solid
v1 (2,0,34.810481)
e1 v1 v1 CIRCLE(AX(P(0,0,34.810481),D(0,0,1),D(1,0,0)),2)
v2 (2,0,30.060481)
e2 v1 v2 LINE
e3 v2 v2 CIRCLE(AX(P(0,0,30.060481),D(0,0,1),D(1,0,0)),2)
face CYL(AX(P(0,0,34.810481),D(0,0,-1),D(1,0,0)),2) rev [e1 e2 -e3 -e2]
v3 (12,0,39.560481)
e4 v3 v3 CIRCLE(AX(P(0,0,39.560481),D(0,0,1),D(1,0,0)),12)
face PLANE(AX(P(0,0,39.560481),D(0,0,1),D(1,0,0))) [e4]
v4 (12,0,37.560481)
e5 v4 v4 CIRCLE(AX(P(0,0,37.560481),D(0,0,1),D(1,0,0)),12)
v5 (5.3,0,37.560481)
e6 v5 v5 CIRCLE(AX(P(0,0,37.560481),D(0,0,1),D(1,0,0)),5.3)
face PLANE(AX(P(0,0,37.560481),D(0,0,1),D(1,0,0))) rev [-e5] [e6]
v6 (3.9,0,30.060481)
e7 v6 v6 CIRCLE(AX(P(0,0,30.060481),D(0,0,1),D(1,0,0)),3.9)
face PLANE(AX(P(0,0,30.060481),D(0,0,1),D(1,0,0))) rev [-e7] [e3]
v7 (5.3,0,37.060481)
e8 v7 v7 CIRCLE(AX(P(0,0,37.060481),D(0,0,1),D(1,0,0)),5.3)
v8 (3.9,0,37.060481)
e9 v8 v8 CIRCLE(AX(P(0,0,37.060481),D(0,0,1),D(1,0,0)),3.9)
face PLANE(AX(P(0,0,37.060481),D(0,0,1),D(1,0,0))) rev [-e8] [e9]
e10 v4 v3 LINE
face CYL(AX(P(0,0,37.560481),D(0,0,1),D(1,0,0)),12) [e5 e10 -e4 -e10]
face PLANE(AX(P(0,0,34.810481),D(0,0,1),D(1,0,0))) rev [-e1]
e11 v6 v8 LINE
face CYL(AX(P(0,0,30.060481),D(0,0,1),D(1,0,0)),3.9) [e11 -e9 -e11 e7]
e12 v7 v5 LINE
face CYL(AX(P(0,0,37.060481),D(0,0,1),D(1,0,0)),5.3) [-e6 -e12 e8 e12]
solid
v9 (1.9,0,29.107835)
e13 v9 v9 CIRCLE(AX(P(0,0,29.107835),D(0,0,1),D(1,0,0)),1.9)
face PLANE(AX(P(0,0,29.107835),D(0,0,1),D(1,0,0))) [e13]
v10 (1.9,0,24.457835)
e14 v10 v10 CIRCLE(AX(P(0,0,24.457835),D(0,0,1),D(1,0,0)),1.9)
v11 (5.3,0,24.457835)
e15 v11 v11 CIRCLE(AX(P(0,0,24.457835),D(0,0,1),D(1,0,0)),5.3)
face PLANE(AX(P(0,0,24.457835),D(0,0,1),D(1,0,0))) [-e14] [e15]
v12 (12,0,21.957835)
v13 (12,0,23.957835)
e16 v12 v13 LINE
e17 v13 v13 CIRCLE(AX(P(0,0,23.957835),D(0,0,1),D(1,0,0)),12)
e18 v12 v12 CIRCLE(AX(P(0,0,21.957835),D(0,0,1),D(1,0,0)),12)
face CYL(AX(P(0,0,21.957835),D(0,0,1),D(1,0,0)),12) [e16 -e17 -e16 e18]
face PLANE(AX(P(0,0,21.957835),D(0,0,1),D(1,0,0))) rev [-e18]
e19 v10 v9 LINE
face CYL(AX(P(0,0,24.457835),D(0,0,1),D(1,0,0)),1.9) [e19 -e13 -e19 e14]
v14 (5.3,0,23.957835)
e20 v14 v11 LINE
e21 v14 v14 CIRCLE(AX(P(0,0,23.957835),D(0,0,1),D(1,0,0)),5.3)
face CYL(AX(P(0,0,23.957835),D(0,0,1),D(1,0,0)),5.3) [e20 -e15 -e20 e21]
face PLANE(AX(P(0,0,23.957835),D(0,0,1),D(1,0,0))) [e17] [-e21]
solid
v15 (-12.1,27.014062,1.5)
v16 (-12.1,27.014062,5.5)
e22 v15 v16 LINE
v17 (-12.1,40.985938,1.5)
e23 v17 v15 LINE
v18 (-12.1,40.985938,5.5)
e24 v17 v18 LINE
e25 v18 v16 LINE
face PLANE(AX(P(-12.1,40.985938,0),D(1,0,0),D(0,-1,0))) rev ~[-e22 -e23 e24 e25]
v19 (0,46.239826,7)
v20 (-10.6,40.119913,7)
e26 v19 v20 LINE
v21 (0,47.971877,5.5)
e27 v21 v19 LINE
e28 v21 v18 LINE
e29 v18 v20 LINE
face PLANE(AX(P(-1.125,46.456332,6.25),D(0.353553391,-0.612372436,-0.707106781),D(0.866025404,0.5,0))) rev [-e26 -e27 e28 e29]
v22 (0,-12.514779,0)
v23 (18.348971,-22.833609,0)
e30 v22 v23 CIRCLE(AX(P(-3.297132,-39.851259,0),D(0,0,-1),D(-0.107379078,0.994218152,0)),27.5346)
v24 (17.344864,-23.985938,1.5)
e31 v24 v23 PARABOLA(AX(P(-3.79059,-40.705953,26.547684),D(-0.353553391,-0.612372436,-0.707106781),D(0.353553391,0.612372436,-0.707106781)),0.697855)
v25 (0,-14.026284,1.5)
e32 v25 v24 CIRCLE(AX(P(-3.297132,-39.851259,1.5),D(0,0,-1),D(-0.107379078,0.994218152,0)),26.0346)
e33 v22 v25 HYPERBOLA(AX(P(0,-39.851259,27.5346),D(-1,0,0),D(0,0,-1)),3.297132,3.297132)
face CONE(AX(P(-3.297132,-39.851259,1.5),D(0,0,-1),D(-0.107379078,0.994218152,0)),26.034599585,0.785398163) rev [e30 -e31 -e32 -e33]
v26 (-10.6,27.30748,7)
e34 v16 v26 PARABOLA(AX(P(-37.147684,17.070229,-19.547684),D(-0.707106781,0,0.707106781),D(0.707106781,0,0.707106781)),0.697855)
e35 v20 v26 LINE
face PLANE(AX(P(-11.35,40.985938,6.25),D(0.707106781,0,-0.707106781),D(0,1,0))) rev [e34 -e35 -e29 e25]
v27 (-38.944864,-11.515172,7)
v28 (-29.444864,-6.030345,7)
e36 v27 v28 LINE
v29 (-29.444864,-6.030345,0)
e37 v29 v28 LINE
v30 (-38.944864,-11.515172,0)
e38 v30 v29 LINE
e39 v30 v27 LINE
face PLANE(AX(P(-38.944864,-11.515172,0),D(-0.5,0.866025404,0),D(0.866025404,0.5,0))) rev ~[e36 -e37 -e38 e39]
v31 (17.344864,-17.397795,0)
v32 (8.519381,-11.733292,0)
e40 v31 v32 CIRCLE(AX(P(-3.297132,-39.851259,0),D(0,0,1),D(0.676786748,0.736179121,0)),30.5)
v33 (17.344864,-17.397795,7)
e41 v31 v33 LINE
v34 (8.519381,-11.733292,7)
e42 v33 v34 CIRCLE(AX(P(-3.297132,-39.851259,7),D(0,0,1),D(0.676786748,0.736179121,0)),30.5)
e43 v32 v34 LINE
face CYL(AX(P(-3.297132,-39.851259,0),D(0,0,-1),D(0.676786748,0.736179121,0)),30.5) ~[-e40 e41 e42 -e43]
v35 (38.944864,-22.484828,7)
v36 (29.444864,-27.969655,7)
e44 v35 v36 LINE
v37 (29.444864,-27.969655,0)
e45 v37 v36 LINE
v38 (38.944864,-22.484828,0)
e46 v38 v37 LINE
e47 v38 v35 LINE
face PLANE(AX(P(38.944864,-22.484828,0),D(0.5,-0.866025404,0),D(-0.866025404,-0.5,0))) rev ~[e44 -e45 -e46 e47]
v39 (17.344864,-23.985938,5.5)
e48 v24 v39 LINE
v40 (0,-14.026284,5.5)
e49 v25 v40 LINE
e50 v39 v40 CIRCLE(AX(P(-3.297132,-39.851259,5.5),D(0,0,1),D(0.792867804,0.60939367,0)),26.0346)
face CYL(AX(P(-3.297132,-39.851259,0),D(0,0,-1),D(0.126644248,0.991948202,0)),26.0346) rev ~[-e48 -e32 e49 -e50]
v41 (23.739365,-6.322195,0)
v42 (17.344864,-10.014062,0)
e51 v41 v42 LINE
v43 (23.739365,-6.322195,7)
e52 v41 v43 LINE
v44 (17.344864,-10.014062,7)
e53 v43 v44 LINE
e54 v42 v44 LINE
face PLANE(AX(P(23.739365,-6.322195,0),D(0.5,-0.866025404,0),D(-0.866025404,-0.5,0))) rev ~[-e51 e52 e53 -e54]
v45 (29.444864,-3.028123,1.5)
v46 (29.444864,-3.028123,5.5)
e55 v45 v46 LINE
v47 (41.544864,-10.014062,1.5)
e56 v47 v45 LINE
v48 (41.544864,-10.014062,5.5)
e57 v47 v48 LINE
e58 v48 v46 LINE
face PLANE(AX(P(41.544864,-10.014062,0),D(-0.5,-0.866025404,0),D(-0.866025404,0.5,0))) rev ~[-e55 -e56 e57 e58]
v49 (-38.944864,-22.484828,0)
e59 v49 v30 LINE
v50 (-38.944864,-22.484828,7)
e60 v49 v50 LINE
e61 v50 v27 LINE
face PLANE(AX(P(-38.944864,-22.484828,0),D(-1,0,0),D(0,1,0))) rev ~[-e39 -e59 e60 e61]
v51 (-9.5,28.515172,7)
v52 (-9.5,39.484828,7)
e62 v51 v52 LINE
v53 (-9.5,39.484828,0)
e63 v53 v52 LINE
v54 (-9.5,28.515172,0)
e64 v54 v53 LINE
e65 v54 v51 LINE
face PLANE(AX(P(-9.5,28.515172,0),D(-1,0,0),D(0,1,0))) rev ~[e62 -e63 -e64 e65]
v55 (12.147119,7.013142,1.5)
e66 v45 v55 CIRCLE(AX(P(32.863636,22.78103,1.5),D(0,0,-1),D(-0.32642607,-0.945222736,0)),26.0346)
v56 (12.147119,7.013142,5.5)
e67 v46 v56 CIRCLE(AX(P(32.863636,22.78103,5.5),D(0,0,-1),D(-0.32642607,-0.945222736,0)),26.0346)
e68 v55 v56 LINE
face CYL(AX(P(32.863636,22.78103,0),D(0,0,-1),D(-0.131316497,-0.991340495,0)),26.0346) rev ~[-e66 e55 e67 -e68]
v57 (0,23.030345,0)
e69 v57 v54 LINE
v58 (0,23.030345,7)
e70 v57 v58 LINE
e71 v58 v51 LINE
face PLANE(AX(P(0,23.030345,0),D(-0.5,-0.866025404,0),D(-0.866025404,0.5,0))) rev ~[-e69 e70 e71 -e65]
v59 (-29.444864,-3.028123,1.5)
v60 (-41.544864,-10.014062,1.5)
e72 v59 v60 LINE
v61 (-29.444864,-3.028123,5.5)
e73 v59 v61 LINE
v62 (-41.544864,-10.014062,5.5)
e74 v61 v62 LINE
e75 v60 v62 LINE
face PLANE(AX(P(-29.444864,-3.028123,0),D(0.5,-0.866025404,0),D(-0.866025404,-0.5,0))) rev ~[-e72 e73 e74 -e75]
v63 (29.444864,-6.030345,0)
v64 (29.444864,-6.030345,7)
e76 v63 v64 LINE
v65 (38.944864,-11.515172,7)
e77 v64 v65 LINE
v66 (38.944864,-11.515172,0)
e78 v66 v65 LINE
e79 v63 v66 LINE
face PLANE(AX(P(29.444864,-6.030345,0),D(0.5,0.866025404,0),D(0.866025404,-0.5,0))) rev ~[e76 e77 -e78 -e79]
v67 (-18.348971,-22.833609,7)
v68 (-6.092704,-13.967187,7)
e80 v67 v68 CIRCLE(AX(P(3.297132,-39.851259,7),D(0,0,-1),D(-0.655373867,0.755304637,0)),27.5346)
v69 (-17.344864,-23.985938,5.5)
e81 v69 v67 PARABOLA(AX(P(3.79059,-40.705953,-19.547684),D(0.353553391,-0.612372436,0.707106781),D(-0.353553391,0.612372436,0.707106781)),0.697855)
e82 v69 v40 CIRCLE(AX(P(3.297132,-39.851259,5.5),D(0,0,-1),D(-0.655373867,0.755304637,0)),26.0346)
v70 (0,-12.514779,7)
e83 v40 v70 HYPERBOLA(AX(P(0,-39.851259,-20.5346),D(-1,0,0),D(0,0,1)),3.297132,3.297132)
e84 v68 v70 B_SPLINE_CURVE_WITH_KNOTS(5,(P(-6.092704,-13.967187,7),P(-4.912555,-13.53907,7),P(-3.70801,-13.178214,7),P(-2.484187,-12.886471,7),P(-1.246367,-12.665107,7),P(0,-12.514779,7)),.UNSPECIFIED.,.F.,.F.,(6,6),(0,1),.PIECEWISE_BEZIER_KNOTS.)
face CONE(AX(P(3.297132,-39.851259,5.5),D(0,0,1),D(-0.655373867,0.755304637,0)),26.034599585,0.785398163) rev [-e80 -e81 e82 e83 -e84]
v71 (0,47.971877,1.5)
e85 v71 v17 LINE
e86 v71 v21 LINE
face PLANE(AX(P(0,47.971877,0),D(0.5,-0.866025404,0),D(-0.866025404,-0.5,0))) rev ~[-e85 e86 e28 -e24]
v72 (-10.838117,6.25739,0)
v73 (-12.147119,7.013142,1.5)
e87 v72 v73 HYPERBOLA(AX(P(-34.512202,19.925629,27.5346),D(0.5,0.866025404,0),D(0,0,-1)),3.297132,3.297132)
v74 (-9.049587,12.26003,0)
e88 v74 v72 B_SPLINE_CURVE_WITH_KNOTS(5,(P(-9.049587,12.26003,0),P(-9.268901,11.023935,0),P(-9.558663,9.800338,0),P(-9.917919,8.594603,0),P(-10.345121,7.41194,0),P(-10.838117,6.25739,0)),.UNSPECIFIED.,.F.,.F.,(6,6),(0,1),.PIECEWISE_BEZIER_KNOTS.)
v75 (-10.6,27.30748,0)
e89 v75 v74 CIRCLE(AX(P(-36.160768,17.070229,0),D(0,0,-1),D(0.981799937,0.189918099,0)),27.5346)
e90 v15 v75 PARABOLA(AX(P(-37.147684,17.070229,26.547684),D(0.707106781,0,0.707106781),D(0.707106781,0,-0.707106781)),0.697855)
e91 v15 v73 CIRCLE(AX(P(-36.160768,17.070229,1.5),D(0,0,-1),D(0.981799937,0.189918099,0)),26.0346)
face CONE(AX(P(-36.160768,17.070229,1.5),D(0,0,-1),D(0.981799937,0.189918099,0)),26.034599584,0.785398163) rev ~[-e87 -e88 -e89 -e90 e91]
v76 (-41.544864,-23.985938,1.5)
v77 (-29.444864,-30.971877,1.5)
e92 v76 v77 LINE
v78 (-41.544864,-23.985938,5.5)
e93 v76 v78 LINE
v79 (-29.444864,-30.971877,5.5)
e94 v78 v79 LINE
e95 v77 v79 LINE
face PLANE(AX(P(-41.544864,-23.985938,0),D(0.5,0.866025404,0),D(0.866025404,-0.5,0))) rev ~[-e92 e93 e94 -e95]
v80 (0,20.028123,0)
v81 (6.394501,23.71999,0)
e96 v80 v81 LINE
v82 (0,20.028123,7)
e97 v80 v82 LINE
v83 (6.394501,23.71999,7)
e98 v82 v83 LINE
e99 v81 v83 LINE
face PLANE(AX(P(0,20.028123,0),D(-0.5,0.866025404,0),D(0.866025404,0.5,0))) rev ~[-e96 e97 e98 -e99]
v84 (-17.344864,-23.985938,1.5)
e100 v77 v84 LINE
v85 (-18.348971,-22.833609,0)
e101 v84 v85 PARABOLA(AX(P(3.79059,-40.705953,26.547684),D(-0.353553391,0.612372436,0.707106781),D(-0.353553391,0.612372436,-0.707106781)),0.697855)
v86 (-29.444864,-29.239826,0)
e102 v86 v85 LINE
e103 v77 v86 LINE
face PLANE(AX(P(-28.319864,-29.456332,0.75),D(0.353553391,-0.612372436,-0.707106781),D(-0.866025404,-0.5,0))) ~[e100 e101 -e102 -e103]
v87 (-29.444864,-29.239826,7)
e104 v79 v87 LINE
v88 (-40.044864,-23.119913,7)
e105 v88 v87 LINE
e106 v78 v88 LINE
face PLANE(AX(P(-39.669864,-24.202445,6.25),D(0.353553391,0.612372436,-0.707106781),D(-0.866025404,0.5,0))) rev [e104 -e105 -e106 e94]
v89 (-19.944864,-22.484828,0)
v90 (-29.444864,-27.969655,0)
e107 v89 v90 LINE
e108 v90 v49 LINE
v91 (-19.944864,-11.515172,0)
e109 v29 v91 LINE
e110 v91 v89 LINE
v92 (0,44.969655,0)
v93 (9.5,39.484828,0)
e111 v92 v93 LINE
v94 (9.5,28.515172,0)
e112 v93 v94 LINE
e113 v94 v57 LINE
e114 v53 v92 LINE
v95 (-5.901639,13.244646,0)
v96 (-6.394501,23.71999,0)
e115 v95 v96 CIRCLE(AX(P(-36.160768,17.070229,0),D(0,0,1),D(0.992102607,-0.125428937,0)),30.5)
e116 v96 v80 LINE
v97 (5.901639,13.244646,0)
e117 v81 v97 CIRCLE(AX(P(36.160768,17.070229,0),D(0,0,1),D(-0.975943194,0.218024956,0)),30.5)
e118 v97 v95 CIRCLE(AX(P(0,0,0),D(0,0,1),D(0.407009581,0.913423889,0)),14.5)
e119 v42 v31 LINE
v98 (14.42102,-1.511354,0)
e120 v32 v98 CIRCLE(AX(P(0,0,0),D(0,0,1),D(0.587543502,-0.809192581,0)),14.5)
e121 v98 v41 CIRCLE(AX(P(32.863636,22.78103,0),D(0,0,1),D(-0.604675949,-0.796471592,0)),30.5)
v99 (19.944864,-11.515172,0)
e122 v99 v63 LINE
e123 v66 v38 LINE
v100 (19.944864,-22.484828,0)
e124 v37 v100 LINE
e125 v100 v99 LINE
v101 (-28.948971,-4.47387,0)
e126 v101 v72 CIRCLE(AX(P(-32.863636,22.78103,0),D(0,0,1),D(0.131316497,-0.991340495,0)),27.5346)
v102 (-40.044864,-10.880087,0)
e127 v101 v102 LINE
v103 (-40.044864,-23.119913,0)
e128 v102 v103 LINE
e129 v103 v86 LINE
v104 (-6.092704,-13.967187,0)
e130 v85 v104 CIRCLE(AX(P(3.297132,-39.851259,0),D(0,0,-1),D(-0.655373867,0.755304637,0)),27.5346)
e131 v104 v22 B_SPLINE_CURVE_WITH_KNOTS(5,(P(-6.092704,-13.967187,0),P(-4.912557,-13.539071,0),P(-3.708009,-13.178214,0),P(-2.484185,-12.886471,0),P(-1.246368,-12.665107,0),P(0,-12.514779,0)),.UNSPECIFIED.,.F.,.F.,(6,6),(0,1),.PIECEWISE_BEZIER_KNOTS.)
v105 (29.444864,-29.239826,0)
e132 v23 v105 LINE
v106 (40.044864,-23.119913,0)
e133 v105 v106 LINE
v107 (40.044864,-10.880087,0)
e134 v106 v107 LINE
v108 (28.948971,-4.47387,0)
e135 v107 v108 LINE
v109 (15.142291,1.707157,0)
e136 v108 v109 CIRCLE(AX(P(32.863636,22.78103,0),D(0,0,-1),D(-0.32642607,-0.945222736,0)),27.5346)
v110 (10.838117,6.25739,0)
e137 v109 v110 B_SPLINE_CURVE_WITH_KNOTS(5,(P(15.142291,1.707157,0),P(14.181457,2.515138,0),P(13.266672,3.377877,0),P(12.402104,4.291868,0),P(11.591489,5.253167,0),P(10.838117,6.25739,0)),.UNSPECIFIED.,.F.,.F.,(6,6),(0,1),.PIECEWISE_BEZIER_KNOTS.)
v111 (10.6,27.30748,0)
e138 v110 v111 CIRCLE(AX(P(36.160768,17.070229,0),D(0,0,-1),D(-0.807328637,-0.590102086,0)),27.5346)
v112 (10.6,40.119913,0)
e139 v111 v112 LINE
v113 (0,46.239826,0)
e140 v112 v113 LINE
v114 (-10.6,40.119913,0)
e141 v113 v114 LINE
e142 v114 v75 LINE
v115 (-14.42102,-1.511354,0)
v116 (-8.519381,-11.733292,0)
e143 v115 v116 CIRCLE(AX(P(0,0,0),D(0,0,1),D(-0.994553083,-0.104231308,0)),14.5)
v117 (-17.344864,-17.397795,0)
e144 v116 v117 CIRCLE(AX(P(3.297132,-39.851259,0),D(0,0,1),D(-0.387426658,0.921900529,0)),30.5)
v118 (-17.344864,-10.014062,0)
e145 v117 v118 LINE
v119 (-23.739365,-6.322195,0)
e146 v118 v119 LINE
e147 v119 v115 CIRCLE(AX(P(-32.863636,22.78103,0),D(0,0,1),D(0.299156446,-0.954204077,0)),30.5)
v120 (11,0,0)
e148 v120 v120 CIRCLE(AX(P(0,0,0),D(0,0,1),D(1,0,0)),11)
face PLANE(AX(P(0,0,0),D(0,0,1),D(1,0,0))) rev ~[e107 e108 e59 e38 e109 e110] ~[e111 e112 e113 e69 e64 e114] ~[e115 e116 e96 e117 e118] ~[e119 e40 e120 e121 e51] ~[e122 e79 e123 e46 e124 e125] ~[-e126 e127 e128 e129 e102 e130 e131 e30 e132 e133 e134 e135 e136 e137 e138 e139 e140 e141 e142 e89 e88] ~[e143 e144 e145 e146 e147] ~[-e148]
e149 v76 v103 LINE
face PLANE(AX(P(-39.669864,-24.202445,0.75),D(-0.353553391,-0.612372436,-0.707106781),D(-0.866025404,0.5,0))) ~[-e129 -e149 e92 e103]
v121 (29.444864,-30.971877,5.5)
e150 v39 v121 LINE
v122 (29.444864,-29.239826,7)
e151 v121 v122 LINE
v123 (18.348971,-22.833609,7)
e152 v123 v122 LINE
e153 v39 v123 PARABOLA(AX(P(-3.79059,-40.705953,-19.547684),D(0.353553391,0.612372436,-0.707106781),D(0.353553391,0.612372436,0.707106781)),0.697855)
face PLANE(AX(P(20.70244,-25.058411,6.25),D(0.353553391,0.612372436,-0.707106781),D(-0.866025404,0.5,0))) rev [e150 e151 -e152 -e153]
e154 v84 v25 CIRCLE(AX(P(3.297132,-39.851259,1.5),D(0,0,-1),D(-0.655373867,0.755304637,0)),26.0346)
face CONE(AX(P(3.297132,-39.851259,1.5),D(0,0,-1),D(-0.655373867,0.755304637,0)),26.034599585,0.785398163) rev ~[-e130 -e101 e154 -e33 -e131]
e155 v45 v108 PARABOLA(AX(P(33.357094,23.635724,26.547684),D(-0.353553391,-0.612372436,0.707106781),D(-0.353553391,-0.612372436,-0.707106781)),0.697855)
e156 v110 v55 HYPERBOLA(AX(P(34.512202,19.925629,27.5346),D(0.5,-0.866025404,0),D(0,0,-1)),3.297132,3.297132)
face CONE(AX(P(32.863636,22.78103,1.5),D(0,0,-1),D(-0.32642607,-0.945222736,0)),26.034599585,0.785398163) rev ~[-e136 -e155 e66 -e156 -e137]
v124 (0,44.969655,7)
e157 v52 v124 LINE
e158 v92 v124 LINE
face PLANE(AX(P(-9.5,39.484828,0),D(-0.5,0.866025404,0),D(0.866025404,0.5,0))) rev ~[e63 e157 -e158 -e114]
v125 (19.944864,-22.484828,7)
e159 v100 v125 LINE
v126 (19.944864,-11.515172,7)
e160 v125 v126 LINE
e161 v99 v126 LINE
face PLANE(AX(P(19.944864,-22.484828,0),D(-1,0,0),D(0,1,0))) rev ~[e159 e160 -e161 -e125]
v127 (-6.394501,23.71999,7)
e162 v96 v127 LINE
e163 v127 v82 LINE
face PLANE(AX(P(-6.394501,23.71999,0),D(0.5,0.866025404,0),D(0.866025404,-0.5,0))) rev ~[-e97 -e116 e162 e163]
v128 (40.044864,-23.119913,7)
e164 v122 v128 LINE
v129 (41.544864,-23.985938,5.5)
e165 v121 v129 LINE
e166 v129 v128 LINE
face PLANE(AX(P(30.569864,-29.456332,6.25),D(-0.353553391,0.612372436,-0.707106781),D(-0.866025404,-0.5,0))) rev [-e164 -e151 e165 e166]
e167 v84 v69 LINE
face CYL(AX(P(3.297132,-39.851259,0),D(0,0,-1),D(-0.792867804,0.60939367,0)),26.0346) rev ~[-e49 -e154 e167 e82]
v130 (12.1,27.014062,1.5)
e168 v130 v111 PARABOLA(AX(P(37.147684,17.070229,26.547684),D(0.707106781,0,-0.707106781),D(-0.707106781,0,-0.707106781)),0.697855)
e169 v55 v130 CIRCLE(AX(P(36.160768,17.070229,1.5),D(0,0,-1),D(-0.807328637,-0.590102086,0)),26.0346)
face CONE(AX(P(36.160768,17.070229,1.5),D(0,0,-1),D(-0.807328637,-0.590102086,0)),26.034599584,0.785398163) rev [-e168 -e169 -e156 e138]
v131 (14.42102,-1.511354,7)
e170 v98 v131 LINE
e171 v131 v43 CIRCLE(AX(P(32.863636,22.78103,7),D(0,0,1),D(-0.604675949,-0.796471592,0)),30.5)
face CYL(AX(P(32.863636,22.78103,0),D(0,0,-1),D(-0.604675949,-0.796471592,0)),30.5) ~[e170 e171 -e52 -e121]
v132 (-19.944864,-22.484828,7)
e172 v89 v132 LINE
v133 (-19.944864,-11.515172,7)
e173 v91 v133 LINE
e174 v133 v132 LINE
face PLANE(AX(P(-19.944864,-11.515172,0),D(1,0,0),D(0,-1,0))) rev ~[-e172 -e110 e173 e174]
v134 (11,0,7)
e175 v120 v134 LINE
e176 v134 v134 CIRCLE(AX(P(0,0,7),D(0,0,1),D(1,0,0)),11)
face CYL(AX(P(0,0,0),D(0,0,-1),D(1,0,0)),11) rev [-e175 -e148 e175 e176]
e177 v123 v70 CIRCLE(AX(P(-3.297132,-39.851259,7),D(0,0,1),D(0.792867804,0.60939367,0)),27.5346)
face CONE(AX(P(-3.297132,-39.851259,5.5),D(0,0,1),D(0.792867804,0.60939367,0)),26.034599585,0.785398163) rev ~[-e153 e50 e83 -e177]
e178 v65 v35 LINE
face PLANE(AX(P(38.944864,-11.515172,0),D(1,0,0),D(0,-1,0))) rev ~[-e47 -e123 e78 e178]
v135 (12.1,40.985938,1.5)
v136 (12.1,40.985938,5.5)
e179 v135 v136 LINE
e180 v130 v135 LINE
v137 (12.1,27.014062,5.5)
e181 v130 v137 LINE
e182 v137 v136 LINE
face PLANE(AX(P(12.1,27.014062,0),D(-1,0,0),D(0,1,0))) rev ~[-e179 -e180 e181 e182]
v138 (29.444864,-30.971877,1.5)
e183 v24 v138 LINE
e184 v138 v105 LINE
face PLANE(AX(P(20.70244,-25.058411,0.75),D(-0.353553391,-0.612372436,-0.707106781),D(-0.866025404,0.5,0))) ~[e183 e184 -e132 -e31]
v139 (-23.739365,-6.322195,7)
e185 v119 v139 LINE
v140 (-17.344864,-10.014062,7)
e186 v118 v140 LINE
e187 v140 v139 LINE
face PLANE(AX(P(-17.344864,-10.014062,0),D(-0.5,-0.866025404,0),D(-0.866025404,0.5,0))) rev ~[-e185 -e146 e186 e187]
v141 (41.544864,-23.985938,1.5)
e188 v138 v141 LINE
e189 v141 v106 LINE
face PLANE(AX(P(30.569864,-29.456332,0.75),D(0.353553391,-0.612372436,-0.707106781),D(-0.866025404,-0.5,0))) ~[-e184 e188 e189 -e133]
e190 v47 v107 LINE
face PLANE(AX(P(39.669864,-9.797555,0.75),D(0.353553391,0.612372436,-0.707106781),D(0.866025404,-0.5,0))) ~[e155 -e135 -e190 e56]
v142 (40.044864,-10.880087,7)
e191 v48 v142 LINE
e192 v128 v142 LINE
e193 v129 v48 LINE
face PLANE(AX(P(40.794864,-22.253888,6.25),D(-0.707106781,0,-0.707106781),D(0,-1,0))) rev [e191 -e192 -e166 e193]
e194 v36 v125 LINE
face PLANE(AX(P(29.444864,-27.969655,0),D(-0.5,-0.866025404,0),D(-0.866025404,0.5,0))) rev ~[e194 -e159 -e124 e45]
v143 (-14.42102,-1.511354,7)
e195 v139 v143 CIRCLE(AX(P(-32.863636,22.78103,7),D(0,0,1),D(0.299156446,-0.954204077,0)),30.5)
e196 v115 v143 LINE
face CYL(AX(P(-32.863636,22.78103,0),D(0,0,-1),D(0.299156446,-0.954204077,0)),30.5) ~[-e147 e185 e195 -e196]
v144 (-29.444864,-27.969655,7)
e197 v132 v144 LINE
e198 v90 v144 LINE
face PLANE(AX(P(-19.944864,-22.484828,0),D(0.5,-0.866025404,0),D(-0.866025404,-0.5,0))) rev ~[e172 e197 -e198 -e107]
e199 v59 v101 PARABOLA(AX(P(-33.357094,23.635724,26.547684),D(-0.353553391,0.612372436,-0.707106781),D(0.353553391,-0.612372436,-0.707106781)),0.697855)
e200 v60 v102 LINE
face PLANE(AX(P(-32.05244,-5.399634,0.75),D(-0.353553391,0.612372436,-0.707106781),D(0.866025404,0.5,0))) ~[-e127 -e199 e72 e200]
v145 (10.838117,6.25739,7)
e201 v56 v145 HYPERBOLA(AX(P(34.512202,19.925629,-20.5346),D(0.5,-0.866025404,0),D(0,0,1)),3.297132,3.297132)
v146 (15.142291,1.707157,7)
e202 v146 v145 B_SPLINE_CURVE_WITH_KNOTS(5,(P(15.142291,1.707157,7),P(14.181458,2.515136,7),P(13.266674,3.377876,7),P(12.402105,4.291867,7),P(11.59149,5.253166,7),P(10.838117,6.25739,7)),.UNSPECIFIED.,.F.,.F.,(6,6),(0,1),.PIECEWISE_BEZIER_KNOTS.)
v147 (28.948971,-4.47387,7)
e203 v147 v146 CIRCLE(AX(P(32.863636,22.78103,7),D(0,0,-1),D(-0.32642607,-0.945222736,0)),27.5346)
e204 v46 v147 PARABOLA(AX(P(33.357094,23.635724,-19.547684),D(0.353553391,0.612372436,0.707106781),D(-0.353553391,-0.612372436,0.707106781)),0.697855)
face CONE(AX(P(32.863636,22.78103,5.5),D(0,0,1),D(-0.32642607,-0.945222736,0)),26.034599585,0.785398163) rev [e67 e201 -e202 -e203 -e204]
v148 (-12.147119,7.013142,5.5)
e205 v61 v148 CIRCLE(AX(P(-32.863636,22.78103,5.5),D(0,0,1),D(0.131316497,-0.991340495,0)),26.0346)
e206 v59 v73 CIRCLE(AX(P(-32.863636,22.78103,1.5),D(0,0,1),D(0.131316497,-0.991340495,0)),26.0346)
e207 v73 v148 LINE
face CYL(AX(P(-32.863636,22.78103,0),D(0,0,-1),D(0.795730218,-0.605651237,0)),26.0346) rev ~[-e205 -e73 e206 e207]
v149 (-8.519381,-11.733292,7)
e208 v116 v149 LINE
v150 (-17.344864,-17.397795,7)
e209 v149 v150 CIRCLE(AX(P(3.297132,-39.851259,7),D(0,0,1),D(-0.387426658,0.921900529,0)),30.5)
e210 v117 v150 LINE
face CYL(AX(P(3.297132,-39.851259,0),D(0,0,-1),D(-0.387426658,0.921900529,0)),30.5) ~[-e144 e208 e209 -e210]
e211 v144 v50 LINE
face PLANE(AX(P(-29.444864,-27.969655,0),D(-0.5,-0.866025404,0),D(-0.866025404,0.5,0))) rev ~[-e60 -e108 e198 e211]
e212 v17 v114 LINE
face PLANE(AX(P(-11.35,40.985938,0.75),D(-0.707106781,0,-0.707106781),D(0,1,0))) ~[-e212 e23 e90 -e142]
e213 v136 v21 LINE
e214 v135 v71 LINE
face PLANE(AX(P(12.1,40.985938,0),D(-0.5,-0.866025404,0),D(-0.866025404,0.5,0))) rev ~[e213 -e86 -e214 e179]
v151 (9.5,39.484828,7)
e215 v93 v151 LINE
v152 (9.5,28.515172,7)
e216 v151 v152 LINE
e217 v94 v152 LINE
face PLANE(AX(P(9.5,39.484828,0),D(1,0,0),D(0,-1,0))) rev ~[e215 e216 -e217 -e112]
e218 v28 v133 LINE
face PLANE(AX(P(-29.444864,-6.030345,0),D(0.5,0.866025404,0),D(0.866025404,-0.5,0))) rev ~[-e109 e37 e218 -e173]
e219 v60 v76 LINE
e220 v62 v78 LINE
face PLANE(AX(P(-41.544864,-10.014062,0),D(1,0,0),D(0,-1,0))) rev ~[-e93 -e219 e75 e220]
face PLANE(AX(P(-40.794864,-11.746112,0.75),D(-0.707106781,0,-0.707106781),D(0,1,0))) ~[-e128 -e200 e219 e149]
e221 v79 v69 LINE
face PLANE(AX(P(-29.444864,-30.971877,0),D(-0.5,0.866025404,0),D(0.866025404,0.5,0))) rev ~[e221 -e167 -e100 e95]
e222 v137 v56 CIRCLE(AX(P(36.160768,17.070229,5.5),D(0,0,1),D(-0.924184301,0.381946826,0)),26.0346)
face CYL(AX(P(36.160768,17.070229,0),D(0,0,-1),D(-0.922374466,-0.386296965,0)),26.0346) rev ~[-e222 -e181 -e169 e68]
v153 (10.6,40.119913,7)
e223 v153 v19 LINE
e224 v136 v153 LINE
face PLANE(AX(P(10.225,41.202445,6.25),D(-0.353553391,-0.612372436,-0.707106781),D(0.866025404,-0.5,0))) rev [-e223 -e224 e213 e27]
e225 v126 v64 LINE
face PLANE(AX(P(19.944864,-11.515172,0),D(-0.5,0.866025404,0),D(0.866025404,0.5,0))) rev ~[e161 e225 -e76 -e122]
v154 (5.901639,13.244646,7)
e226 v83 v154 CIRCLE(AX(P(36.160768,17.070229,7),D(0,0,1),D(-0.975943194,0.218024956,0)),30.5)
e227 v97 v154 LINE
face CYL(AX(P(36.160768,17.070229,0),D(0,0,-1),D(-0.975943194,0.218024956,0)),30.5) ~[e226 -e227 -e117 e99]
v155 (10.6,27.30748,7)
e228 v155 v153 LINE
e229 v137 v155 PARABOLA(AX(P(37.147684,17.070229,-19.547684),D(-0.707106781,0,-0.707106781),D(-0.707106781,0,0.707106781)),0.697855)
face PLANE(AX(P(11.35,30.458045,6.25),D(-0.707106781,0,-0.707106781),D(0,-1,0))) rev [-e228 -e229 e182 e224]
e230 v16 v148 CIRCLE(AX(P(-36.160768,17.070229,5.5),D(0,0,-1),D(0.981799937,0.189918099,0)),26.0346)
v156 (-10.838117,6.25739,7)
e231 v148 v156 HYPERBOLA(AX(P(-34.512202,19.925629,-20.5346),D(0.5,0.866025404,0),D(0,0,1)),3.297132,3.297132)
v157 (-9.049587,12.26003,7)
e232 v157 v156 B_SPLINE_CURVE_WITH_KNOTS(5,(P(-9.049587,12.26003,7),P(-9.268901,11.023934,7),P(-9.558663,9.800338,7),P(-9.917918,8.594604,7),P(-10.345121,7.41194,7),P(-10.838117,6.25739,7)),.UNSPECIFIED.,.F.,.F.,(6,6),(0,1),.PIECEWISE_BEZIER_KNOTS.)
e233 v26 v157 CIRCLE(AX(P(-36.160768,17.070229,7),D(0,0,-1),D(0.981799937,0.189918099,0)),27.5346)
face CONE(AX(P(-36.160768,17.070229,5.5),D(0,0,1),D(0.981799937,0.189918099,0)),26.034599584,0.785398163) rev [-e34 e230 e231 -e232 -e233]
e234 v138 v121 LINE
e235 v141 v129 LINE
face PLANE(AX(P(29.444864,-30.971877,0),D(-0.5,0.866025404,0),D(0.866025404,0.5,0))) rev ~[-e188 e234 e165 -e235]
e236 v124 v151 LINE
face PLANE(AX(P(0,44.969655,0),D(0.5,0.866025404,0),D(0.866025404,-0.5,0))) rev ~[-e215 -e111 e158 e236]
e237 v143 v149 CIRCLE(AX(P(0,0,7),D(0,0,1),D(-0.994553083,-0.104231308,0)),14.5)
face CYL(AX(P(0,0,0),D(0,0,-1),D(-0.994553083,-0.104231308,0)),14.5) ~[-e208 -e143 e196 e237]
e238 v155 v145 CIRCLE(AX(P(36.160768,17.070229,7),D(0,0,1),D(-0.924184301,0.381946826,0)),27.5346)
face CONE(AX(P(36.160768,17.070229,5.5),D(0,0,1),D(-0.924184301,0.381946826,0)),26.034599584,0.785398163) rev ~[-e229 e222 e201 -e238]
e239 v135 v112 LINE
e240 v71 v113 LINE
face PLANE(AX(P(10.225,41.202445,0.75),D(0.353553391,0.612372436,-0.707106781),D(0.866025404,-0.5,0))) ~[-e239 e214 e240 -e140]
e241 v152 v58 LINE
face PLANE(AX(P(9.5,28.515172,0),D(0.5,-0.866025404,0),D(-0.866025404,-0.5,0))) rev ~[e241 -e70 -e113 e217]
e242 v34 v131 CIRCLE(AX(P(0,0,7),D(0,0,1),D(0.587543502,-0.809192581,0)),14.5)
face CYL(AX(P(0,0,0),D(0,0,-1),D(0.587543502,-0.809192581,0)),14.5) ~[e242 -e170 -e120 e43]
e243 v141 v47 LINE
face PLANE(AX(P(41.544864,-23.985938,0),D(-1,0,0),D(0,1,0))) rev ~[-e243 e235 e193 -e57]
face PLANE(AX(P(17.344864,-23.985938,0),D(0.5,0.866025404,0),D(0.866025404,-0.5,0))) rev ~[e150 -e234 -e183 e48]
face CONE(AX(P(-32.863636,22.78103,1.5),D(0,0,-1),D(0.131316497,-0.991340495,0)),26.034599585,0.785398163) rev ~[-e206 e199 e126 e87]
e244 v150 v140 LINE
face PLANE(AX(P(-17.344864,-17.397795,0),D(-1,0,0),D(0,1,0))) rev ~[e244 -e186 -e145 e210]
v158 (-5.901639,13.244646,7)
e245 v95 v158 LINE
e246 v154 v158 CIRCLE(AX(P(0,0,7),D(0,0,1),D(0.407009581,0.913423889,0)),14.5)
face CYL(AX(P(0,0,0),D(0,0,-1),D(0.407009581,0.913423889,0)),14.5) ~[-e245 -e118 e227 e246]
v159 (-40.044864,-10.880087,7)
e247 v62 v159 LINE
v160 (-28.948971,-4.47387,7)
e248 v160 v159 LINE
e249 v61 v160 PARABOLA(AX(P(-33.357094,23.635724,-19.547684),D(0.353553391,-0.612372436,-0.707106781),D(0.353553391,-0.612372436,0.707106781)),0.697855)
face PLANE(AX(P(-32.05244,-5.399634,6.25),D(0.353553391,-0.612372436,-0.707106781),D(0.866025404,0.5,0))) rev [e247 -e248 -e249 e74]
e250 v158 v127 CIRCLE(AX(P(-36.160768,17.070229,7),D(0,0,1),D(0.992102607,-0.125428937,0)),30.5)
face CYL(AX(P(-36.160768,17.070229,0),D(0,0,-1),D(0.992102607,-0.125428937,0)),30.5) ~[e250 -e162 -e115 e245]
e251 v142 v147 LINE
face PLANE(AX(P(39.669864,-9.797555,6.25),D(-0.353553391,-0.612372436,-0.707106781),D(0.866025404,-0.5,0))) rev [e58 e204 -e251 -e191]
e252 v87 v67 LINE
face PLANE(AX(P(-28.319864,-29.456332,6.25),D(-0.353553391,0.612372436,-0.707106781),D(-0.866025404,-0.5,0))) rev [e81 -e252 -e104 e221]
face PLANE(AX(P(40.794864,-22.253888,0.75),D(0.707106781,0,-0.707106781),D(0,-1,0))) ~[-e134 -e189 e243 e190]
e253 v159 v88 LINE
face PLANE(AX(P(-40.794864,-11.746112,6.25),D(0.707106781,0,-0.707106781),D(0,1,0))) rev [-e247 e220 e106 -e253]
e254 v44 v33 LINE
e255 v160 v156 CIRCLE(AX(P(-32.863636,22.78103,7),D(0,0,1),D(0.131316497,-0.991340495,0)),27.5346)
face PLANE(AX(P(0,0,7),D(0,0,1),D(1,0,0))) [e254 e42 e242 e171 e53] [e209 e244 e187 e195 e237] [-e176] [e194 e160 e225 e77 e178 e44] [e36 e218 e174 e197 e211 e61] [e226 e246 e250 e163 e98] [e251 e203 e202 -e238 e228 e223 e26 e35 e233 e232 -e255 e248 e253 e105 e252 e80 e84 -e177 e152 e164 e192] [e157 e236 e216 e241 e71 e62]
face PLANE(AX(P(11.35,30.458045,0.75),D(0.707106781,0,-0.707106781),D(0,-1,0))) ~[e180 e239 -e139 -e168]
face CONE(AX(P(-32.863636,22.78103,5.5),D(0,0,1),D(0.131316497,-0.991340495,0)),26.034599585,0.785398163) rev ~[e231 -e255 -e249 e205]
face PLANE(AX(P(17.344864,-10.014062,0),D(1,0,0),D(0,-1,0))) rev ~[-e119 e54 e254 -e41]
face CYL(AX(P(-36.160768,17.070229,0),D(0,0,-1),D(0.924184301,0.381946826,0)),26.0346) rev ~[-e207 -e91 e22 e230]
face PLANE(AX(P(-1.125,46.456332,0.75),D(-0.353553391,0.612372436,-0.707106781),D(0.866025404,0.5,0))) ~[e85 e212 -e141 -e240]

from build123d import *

# Parameters (mm, degrees)
F0_R        = 11
F1_DEPTH    = 7
F2_C1_SIZE  = 1.5
F2_C2_SIZE  = 1.5
F2_C3_SIZE  = 1.5
F2_C4_SIZE  = 1.5
F2_C5_SIZE  = 1.5
F2_C6_SIZE  = 1.5
F2_C7_SIZE  = 1.5
F2_C8_SIZE  = 1.5
F2_C9_SIZE  = 1.5
F2_C10_SIZE = 1.5
F2_C11_SIZE = 1.5
F2_C12_SIZE = 1.5
F2_C13_SIZE = 1.5
F2_C14_SIZE = 1.5
F2_C15_SIZE = 1.5
F2_C16_SIZE = 1.5
F2_C17_SIZE = 1.5
F2_C18_SIZE = 1.5
F2_C19_SIZE = 1.5
F2_C20_SIZE = 1.5
F2_C21_SIZE = 1.5
F2_C22_SIZE = 1.5
F2_C23_SIZE = 1.5
F2_C24_SIZE = 1.5
F2_C25_SIZE = 1.5
F2_C26_SIZE = 1.5
F2_C27_SIZE = 1.5
F2_C28_SIZE = 1.5
F2_C29_SIZE = 1.5
F2_C30_SIZE = 1.5
F2_C31_SIZE = 1.5
F2_C32_SIZE = 1.5
F2_C33_SIZE = 1.5
F2_C34_SIZE = 1.5
F2_C35_SIZE = 1.5
F2_C36_SIZE = 1.5


with BuildPart() as f1:
    # F0 (on Top) → F1 (new body)
    with BuildSketch(Plane.XY):
        with BuildLine():
            Line((-12.1000001989, 40.985938372), (-12.1000001989, 27.014061628))
            ThreePointArc((-12.1000001989, 27.014061628), (-10.1262410801, 17.0088965937), (-12.1471185409, 7.0131421595))
            ThreePointArc((-12.1471185409, 7.0131421595), (-19.7932570806, 0.2651337234), (-29.4448637287, -3.028123256))
            Line((-29.4448637287, -3.028123256), (-41.5448639275, -10.014061628))
            Line((-41.5448639275, -10.014061628), (-41.5448639275, -23.985938372))
            Line((-41.5448639275, -23.985938372), (-29.4448637287, -30.971876744))
            Line((-29.4448637287, -30.971876744), (-17.3448635298, -23.985938372))
            ThreePointArc((-17.3448635298, -23.985938372), (-9.6670160005, -17.2740303171), (0, -14.0262843189))
            ThreePointArc((0, -14.0262843189), (9.6670160005, -17.2740303171), (17.3448635298, -23.985938372))
            Line((17.3448635298, -23.985938372), (29.4448637287, -30.971876744))
            Line((29.4448637287, -30.971876744), (41.5448639275, -23.985938372))
            Line((41.5448639275, -23.985938372), (41.5448639275, -10.014061628))
            Line((41.5448639275, -10.014061628), (29.4448637287, -3.028123256))
            ThreePointArc((29.4448637287, -3.028123256), (19.7932570806, 0.2651337234), (12.1471185409, 7.0131421595))
            ThreePointArc((12.1471185409, 7.0131421595), (10.1262410801, 17.0088965937), (12.1000001989, 27.014061628))
            Line((12.1000001989, 27.014061628), (12.1000001989, 40.985938372))
            Line((12.1000001989, 40.985938372), (0, 47.971876744))
            Line((0, 47.971876744), (-12.1000001989, 40.985938372))
        make_face()
        Polygon((-29.4448637287, -27.9696551146), (-38.9448637287, -22.4848275573), (-38.9448637287, -11.5151724427), (-29.4448637287, -6.0303448854), (-19.9448637287, -11.5151724427), (-19.9448637287, -22.4848275573), align=None, mode=Mode.SUBTRACT)
        with BuildLine():
            Line((-17.3448635298, -17.39779537), (-17.3448635298, -10.014061628))
            Line((-17.3448635298, -10.014061628), (-23.7393645251, -6.322194757))
            ThreePointArc((-23.7393645251, -6.322194757), (-18.8718751166, -4.3202733927), (-14.4210197002, -1.5113539646))
            ThreePointArc((-14.4210197002, -1.5113539646), (-12.5573683549, -7.25), (-8.5193807775, -11.7332924266))
            ThreePointArc((-8.5193807775, -11.7332924266), (-13.1774040677, -14.1833865716), (-17.3448635298, -17.39779537))
        make_face(mode=Mode.SUBTRACT)
        Circle(F0_R, mode=Mode.SUBTRACT)
        Polygon((38.9448637287, -11.5151724427), (38.9448637287, -22.4848275573), (29.4448637287, -27.9696551146), (19.9448637287, -22.4848275573), (19.9448637287, -11.5151724427), (29.4448637287, -6.0303448854), align=None, mode=Mode.SUBTRACT)
        with BuildLine():
            Line((23.7393645251, -6.322194757), (17.3448635298, -10.014061628))
            Line((17.3448635298, -10.014061628), (17.3448635298, -17.39779537))
            ThreePointArc((17.3448635298, -17.39779537), (13.1774040677, -14.1833865716), (8.5193807775, -11.7332924266))
            ThreePointArc((8.5193807775, -11.7332924266), (12.5573683549, -7.25), (14.4210197002, -1.5113539646))
            ThreePointArc((14.4210197002, -1.5113539646), (18.8718751166, -4.3202733927), (23.7393645251, -6.322194757))
        make_face(mode=Mode.SUBTRACT)
        with BuildLine():
            ThreePointArc((6.3945009953, 23.719990127), (5.6944710489, 18.5036599644), (5.9016389227, 13.2446463911))
            ThreePointArc((5.9016389227, 13.2446463911), (0, 14.5), (-5.9016389227, 13.2446463911))
            ThreePointArc((-5.9016389227, 13.2446463911), (-5.6944710489, 18.5036599644), (-6.3945009953, 23.719990127))
            Line((-6.3945009953, 23.719990127), (0, 20.028123256))
            Line((0, 20.028123256), (6.3945009953, 23.719990127))
        make_face(mode=Mode.SUBTRACT)
        Polygon((9.5, 39.4848275573), (9.5, 28.5151724427), (0, 23.0303448854), (-9.5, 28.5151724427), (-9.5, 39.4848275573), (0, 44.9696551146), align=None, mode=Mode.SUBTRACT)
    extrude(amount=F1_DEPTH)

    # F2: chamfer of 1.5 on 36 edges, made by hand

    # F2_c1
    f2_c1_edges = [f1.edges().sort_by_distance(p)[0] for p in [
        (-12.1000001989, 34, 0),
    ]]
    chamfer(f2_c1_edges, length=F2_C1_SIZE)

    # F2_c2
    f2_c2_edges = [f1.edges().sort_by_distance(p)[0] for p in [
        (-12.1000001989, 34, 7),
    ]]
    chamfer(f2_c2_edges, length=F2_C2_SIZE)

    # F2_c3
    f2_c3_edges = [f1.edges().sort_by_distance(p)[0] for p in [
        (-10.2635253889, 14.3994277983, 0),
    ]]
    chamfer(f2_c3_edges, length=F2_C3_SIZE)

    # F2_c4
    f2_c4_edges = [f1.edges().sort_by_distance(p)[0] for p in [
        (-10.2635253889, 14.3994277983, 7),
    ]]
    chamfer(f2_c4_edges, length=F2_C4_SIZE)

    # F2_c5
    f2_c5_edges = [f1.edges().sort_by_distance(p)[0] for p in [
        (-19.7932570806, 0.2651337234, 0),
    ]]
    chamfer(f2_c5_edges, length=F2_C5_SIZE)

    # F2_c6
    f2_c6_edges = [f1.edges().sort_by_distance(p)[0] for p in [
        (-19.7932570806, 0.2651337234, 7),
    ]]
    chamfer(f2_c6_edges, length=F2_C6_SIZE)

    # F2_c7
    f2_c7_edges = [f1.edges().sort_by_distance(p)[0] for p in [
        (-36.9861521886, -7.3820881783, 0),
    ]]
    chamfer(f2_c7_edges, length=F2_C7_SIZE)

    # F2_c8
    f2_c8_edges = [f1.edges().sort_by_distance(p)[0] for p in [
        (-36.9861521886, -7.3820881783, 7),
    ]]
    chamfer(f2_c8_edges, length=F2_C8_SIZE)

    # F2_c9
    f2_c9_edges = [f1.edges().sort_by_distance(p)[0] for p in [
        (-41.5448639275, -17.8660254038, 0),
    ]]
    chamfer(f2_c9_edges, length=F2_C9_SIZE)

    # F2_c10
    f2_c10_edges = [f1.edges().sort_by_distance(p)[0] for p in [
        (-41.5448639275, -17.8660254038, 7),
    ]]
    chamfer(f2_c10_edges, length=F2_C10_SIZE)

    # F2_c11
    f2_c11_edges = [f1.edges().sort_by_distance(p)[0] for p in [
        (-34.7448638281, -27.9119202599, 0),
    ]]
    chamfer(f2_c11_edges, length=F2_C11_SIZE)

    # F2_c12
    f2_c12_edges = [f1.edges().sort_by_distance(p)[0] for p in [
        (-34.7448638281, -27.9119202599, 7),
    ]]
    chamfer(f2_c12_edges, length=F2_C12_SIZE)

    # F2_c13
    f2_c13_edges = [f1.edges().sort_by_distance(p)[0] for p in [
        (-22.6448636292, -27.0458948561, 0),
    ]]
    chamfer(f2_c13_edges, length=F2_C13_SIZE)

    # F2_c14
    f2_c14_edges = [f1.edges().sort_by_distance(p)[0] for p in [
        (-22.6448636292, -27.0458948561, 7),
    ]]
    chamfer(f2_c14_edges, length=F2_C14_SIZE)

    # F2_c15
    f2_c15_edges = [f1.edges().sort_by_distance(p)[0] for p in [
        (-7.3385075789, -16.0881876183, 0),
    ]]
    chamfer(f2_c15_edges, length=F2_C15_SIZE)

    # F2_c16
    f2_c16_edges = [f1.edges().sort_by_distance(p)[0] for p in [
        (-7.3385075789, -16.0881876183, 7),
    ]]
    chamfer(f2_c16_edges, length=F2_C16_SIZE)

    # F2_c17
    f2_c17_edges = [f1.edges().sort_by_distance(p)[0] for p in [
        (9.6670160005, -17.2740303171, 0),
    ]]
    chamfer(f2_c17_edges, length=F2_C17_SIZE)

    # F2_c18
    f2_c18_edges = [f1.edges().sort_by_distance(p)[0] for p in [
        (9.6670160005, -17.2740303171, 7),
    ]]
    chamfer(f2_c18_edges, length=F2_C18_SIZE)

    # F2_c19
    f2_c19_edges = [f1.edges().sort_by_distance(p)[0] for p in [
        (24.8861519897, -28.3399032944, 0),
    ]]
    chamfer(f2_c19_edges, length=F2_C19_SIZE)

    # F2_c20
    f2_c20_edges = [f1.edges().sort_by_distance(p)[0] for p in [
        (24.8861519897, -28.3399032944, 7),
    ]]
    chamfer(f2_c20_edges, length=F2_C20_SIZE)

    # F2_c21
    f2_c21_edges = [f1.edges().sort_by_distance(p)[0] for p in [
        (36.2448638281, -27.0458948561, 0),
    ]]
    chamfer(f2_c21_edges, length=F2_C21_SIZE)

    # F2_c22
    f2_c22_edges = [f1.edges().sort_by_distance(p)[0] for p in [
        (36.2448638281, -27.0458948561, 7),
    ]]
    chamfer(f2_c22_edges, length=F2_C22_SIZE)

    # F2_c23
    f2_c23_edges = [f1.edges().sort_by_distance(p)[0] for p in [
        (41.5448639275, -16.1339745962, 0),
    ]]
    chamfer(f2_c23_edges, length=F2_C23_SIZE)

    # F2_c24
    f2_c24_edges = [f1.edges().sort_by_distance(p)[0] for p in [
        (41.5448639275, -16.1339745962, 7),
    ]]
    chamfer(f2_c24_edges, length=F2_C24_SIZE)

    # F2_c25
    f2_c25_edges = [f1.edges().sort_by_distance(p)[0] for p in [
        (34.7448638281, -6.0880797401, 0),
    ]]
    chamfer(f2_c25_edges, length=F2_C25_SIZE)

    # F2_c26
    f2_c26_edges = [f1.edges().sort_by_distance(p)[0] for p in [
        (34.7448638281, -6.0880797401, 7),
    ]]
    chamfer(f2_c26_edges, length=F2_C26_SIZE)

    # F2_c27
    f2_c27_edges = [f1.edges().sort_by_distance(p)[0] for p in [
        (17.6020329678, 1.68875982, 0),
    ]]
    chamfer(f2_c27_edges, length=F2_C27_SIZE)

    # F2_c28
    f2_c28_edges = [f1.edges().sort_by_distance(p)[0] for p in [
        (17.6020329678, 1.68875982, 7),
    ]]
    chamfer(f2_c28_edges, length=F2_C28_SIZE)

    # F2_c29
    f2_c29_edges = [f1.edges().sort_by_distance(p)[0] for p in [
        (10.1262410801, 17.0088965937, 0),
    ]]
    chamfer(f2_c29_edges, length=F2_C29_SIZE)

    # F2_c30
    f2_c30_edges = [f1.edges().sort_by_distance(p)[0] for p in [
        (10.1262410801, 17.0088965937, 7),
    ]]
    chamfer(f2_c30_edges, length=F2_C30_SIZE)

    # F2_c31
    f2_c31_edges = [f1.edges().sort_by_distance(p)[0] for p in [
        (12.1000001989, 35.7219914727, 0),
    ]]
    chamfer(f2_c31_edges, length=F2_C31_SIZE)

    # F2_c32
    f2_c32_edges = [f1.edges().sort_by_distance(p)[0] for p in [
        (12.1000001989, 35.7219914727, 7),
    ]]
    chamfer(f2_c32_edges, length=F2_C32_SIZE)

    # F2_c33
    f2_c33_edges = [f1.edges().sort_by_distance(p)[0] for p in [
        (5.3000000994, 44.9119202599, 0),
    ]]
    chamfer(f2_c33_edges, length=F2_C33_SIZE)

    # F2_c34
    f2_c34_edges = [f1.edges().sort_by_distance(p)[0] for p in [
        (5.3000000994, 44.9119202599, 7),
    ]]
    chamfer(f2_c34_edges, length=F2_C34_SIZE)

    # F2_c35
    f2_c35_edges = [f1.edges().sort_by_distance(p)[0] for p in [
        (-6.0500000994, 44.478907558, 0),
    ]]
    chamfer(f2_c35_edges, length=F2_C35_SIZE)

    # F2_c36
    f2_c36_edges = [f1.edges().sort_by_distance(p)[0] for p in [
        (-6.0500000994, 44.478907558, 7),
    ]]
    chamfer(f2_c36_edges, length=F2_C36_SIZE)


with BuildPart() as f4:
    # F3 (on Front) → F4 (revolve)
    with BuildSketch(Plane.XZ):
        Polygon((12, 37.5604808674), (12, 39.5604808674), (0, 39.5604808674), (0, 38.3482346942), (0, 34.8104808674), (2, 34.8104808674), (2, 30.0604808674), (3.9, 30.0604808674), (3.9, 37.0604808674), (5.3, 37.0604808674), (5.3, 37.5604808674), align=None)
    revolve(axis=Axis((0, 0, 36.5793577808), (0, 0, 1)))

    # F3 (on Front) → F5 (revolve)
    with BuildSketch(Plane.XZ):
        Polygon((12, 37.5604808674), (12, 39.5604808674), (0, 39.5604808674), (0, 38.3482346942), (0, 34.8104808674), (2, 34.8104808674), (2, 30.0604808674), (3.9, 30.0604808674), (3.9, 37.0604808674), (5.3, 37.0604808674), (5.3, 37.5604808674), align=None)
    revolve(axis=Axis((0, 0, 30.0604808674), (0, 0, 1)))


with BuildPart() as f5:
    # F3 (on Front) → F5, piece 2 (revolve)
    with BuildSketch(Plane.XZ):
        Polygon((1.9, 29.1078351825), (0, 29.1078351825), (0, 21.9578351825), (12, 21.9578351825), (12, 23.9578351825), (5.3, 23.9578351825), (5.3, 24.4578351825), (1.9, 24.4578351825), align=None)
    revolve(axis=Axis((0, 0, 30.0604808674), (0, 0, 1)))


solid = Compound([f1.part, f4.part, f5.part])
